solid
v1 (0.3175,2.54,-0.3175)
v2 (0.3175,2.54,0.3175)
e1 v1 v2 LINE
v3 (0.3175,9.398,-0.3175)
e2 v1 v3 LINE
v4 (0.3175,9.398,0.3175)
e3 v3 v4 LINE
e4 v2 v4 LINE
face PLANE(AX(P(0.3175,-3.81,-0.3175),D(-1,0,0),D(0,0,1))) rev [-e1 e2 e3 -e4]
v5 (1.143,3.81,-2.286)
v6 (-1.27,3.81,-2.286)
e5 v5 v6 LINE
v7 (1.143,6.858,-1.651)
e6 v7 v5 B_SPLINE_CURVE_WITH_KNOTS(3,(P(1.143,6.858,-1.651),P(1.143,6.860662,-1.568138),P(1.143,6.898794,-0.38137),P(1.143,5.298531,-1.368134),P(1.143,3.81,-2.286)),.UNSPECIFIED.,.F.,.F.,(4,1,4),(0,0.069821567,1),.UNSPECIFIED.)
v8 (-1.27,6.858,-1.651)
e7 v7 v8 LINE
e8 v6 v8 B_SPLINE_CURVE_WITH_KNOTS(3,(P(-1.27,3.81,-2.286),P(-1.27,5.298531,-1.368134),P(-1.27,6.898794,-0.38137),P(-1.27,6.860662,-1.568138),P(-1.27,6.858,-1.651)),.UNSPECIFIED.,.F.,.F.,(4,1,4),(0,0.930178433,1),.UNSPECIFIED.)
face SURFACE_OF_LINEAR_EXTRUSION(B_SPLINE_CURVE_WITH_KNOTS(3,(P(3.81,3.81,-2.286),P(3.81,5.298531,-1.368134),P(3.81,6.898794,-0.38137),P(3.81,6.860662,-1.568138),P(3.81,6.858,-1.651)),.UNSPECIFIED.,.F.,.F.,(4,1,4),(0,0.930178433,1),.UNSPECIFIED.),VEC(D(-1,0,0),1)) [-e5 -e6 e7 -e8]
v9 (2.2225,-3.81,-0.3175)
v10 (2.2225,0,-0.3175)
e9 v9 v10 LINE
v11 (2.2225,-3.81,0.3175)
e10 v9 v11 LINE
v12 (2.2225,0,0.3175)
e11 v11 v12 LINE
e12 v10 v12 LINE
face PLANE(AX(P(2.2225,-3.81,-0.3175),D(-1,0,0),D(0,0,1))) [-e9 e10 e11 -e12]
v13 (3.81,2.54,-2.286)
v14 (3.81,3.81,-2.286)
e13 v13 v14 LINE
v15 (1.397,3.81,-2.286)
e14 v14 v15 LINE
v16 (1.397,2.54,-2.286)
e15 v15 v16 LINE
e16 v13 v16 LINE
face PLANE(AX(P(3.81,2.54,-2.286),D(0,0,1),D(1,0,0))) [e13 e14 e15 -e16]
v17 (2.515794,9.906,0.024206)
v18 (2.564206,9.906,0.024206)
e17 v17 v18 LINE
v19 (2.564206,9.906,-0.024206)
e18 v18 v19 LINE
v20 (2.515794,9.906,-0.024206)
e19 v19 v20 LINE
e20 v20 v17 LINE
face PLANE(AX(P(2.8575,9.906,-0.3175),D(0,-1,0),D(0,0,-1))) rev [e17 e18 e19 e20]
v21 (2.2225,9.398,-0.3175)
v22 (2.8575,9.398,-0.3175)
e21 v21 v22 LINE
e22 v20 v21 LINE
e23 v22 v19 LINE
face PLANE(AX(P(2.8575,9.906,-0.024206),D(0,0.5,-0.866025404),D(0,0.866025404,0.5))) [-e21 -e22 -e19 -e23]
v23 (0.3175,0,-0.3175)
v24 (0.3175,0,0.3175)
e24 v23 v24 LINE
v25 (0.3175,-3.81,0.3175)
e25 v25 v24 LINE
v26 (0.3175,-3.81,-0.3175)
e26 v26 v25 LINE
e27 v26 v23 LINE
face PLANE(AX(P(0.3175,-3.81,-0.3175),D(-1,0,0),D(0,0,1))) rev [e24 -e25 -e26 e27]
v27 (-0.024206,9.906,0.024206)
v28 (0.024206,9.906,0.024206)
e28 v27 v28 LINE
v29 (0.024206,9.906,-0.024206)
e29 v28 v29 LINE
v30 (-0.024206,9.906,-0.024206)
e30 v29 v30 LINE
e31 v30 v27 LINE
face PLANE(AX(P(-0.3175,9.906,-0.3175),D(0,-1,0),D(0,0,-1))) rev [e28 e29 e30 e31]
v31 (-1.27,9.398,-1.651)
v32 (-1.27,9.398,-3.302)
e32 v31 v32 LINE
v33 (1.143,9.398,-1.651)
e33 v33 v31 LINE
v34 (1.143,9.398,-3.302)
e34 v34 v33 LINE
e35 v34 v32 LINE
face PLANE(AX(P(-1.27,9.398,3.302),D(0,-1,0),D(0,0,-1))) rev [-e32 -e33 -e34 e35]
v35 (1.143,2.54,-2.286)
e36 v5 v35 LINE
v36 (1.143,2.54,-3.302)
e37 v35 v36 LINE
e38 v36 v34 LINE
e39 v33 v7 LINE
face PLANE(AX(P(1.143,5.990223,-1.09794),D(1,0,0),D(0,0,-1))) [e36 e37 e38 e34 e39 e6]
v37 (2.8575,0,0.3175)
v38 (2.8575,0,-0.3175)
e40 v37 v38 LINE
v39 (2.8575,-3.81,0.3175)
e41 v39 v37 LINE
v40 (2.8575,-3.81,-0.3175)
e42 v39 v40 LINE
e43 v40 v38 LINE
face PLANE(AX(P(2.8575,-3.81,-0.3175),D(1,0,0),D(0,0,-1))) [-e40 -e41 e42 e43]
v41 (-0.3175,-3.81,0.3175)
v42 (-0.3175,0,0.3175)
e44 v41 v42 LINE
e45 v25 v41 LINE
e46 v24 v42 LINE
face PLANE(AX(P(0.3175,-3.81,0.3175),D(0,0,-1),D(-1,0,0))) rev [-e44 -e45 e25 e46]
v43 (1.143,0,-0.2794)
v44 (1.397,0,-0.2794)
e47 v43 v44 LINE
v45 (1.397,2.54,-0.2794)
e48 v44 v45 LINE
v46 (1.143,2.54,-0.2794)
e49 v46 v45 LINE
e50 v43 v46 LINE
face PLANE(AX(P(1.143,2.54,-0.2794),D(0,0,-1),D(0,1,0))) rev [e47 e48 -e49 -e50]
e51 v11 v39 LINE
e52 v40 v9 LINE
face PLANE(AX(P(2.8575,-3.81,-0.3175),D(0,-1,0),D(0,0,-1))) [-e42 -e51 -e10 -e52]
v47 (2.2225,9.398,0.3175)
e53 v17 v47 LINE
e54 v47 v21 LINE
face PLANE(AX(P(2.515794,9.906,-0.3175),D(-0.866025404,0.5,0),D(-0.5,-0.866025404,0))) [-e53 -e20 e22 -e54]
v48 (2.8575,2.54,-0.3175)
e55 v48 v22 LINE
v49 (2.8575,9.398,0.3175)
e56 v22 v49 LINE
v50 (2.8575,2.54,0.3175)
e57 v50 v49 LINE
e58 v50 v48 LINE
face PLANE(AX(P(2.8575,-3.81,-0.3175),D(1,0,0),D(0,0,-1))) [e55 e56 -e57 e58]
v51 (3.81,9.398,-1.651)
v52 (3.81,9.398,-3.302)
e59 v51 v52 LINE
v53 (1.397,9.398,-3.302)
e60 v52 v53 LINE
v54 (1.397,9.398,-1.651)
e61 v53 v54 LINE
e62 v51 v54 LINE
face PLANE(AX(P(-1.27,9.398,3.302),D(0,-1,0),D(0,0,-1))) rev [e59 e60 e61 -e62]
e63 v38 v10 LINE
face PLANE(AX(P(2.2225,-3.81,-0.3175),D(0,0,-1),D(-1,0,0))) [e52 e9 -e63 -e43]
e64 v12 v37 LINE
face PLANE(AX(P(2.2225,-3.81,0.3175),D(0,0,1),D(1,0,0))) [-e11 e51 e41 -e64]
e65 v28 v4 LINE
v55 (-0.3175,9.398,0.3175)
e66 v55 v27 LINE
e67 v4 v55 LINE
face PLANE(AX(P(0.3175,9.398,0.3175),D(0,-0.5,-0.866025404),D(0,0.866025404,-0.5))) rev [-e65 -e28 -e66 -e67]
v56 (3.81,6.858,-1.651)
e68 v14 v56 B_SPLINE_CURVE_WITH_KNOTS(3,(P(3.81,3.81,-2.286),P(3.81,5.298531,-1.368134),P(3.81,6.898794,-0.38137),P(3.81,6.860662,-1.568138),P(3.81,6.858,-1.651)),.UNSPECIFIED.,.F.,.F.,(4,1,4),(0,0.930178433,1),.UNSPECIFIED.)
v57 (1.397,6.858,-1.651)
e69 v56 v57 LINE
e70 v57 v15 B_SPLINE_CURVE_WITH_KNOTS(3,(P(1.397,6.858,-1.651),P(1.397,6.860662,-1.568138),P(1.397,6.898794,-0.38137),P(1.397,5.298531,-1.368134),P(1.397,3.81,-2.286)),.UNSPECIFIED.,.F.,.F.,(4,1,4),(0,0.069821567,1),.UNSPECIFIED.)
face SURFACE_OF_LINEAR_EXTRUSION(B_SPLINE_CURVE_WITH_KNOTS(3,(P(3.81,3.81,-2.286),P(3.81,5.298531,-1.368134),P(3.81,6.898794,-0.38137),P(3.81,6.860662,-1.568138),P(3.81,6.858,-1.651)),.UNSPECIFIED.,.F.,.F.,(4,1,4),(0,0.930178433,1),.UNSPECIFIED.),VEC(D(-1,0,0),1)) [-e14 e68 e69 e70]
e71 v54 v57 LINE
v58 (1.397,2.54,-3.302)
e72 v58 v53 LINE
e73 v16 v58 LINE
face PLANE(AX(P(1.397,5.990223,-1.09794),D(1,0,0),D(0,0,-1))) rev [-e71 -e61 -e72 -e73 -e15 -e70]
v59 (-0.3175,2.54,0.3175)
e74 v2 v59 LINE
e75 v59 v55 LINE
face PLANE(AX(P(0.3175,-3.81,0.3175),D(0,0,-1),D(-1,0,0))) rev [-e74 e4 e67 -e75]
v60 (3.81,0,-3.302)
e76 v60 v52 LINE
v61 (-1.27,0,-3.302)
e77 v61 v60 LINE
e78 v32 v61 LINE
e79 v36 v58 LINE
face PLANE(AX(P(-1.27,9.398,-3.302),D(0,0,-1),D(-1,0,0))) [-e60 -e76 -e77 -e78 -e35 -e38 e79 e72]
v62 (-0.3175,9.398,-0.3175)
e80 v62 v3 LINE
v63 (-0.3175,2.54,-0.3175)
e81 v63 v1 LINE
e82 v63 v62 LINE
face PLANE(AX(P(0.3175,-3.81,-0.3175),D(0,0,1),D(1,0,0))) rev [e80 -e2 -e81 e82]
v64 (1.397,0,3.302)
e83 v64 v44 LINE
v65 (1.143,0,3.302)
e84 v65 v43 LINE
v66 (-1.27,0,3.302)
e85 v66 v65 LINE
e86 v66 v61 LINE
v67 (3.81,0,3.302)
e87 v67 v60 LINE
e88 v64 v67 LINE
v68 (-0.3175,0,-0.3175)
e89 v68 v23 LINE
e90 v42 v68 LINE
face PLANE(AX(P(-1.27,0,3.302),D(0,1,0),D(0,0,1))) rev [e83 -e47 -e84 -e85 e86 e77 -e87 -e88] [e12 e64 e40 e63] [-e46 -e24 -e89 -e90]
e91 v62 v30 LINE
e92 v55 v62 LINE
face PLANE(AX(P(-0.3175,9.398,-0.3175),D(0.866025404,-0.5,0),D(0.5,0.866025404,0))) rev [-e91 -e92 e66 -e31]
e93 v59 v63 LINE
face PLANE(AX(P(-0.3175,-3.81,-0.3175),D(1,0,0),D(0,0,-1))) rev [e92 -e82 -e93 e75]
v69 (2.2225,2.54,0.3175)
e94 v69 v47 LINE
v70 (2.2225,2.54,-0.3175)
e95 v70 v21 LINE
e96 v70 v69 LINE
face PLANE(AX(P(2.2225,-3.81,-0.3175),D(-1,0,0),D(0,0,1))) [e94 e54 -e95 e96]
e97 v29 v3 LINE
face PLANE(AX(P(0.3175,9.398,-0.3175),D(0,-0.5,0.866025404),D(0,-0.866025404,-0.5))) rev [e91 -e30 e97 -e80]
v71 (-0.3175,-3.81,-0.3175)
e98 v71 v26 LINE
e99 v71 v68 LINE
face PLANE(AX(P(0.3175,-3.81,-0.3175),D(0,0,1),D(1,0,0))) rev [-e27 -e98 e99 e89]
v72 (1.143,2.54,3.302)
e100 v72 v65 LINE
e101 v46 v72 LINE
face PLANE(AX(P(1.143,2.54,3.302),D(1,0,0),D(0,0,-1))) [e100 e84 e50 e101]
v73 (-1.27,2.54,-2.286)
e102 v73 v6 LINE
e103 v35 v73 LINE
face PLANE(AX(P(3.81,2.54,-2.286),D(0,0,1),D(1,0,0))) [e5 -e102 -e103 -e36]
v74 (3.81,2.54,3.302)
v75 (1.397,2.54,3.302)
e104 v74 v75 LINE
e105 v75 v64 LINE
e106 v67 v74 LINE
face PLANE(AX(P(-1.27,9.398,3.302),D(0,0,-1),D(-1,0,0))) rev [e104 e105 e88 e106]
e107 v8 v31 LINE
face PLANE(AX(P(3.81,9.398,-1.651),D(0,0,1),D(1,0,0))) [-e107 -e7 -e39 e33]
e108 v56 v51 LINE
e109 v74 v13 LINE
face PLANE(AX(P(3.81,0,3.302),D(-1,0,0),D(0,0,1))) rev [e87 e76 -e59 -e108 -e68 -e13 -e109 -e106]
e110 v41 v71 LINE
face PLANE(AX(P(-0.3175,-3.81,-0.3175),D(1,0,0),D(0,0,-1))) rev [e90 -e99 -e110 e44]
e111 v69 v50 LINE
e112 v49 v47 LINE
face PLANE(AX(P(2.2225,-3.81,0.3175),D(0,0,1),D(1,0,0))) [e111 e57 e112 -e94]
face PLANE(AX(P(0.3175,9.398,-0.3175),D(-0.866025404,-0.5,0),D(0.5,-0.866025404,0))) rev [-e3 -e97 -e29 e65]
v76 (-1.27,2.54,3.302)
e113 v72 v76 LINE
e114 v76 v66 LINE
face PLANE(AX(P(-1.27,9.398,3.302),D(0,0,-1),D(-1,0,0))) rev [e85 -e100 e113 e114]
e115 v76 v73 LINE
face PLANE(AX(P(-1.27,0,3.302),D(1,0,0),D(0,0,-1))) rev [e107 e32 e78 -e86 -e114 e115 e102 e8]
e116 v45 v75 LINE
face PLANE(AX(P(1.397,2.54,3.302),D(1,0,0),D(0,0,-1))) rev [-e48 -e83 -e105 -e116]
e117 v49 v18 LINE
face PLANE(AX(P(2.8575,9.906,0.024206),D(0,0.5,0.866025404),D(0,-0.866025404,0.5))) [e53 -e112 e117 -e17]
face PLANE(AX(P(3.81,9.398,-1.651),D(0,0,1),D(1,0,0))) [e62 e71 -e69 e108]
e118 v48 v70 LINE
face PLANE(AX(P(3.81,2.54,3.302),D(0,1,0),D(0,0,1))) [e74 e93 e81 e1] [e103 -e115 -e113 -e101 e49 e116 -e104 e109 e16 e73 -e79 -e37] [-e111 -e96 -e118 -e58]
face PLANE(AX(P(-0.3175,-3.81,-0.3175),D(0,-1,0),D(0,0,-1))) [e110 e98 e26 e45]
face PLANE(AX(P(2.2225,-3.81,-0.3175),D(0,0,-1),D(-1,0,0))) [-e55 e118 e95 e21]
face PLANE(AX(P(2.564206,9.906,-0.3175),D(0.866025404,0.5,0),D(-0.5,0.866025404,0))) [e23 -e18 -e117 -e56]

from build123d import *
from OCP.BRepFilletAPI import BRepFilletAPI_MakeChamfer

# Parameters (mm, degrees)
BASE_EXTRUDE_DEPTH        = 3.302
BASE_EXTRUDE_DEPTH_BACK   = 3.302
SKETCH3_W                 = 5.08
SKETCH3_H                 = 9.398
CUT_EXTRUDE1_START        = -5.08
CUT_EXTRUDE1_DEPTH        = 5.08
SKETCH5_W                 = 3.5814
SKETCH5_H                 = 2.54
CUT_EXTRUDE2_DEPTH        = 0.127
BOSS_EXTRUDE1_START       = -9.906
SKETCH6_W                 = 0.635
SKETCH6_H                 = 0.635
BOSS_EXTRUDE1_DEPTH       = 13.716
CHAMFER1_SIZE             = 0.508
CHAMFER1_SIZE2            = 0.293293937
CHAMFER1_OF_MIRROR1_SIZE  = 0.508
CHAMFER1_OF_MIRROR1_SIZE2 = 0.293293937


# Read off the part's stored shape, not the designer's step: Cut-Extrude1
with BuildPart() as part:
    # Sketch3 → Base-Extrude (new, two sides: drawn at the far end of the back side and taken through both)
    with BuildSketch(Plane.XY.offset(-BASE_EXTRUDE_DEPTH_BACK)):
        with Locations((1.27, 4.699)):
            Rectangle(SKETCH3_W, SKETCH3_H)
    extrude(amount=BASE_EXTRUDE_DEPTH + BASE_EXTRUDE_DEPTH_BACK)

    # Cut-Extrude1 outline → Cut-Extrude1 (cut)
    with BuildSketch(Plane.ZY.offset(1.27).offset(CUT_EXTRUDE1_START)):
        with BuildLine():
            add(Edge.make_bspline(
                [(-2.286, 3.81), (-1.368133743, 5.298530644), (-0.381370103, 6.898794196), (-1.568138006, 6.86066242), (-1.651, 6.858)],
                knots=[0, 0, 0, 0, 0.930178433, 1, 1, 1, 1], degree=3))
            Line((-2.286, 3.81), (-2.286, 2.54))
            Line((-2.286, 2.54), (3.302, 2.54))
            Line((3.302, 2.54), (3.302, 9.398))
            Line((3.302, 9.398), (-1.651, 9.398))
            Line((-1.651, 9.398), (-1.651, 6.858))
        make_face()
    extrude(amount=CUT_EXTRUDE1_DEPTH, mode=Mode.SUBTRACT)

    # Sketch5 → Cut-Extrude2 (cut, symmetric)
    with BuildSketch(Plane(origin=(1.27, 0, 0), x_dir=(0, 0, -1), z_dir=(1, 0, 0))):
        with Locations((-1.5113, 1.27)):
            Rectangle(SKETCH5_W, SKETCH5_H)
        with BuildLine():
            Line((3.302, 2.54), (3.302, 9.398))
            Line((3.302, 9.398), (1.651, 9.398))
            Line((1.651, 9.398), (1.651, 6.858))
            add(Edge.make_bspline(
                [(2.286, 3.81), (1.368133743, 5.298530644), (0.381370103, 6.898794196), (1.568138006, 6.86066242), (1.651, 6.858)],
                knots=[0, 0, 0, 0, 0.930178433, 1, 1, 1, 1], degree=3))
            Line((2.286, 3.81), (2.286, 2.54))
            Line((2.286, 2.54), (3.302, 2.54))
        make_face()
    extrude(amount=CUT_EXTRUDE2_DEPTH, both=True, mode=Mode.SUBTRACT)

    # Sketch6 → Boss-Extrude1 (add)
    with BuildSketch(Plane.XZ.offset(BOSS_EXTRUDE1_START)):
        Rectangle(SKETCH6_W, SKETCH6_H)
    boss_extrude1 = extrude(amount=BOSS_EXTRUDE1_DEPTH)

    # Chamfer1: one chamfer whose edges measure the first distance from different faces: ONE call of the kernel's chamfer builder (chamfer() names one face for all edges)
    chamfer1_edges_1 = [part.edges().sort_by_distance(p)[0] for p in [
        (-0.3175, 9.906, 0),
    ]]
    chamfer1_side_1 = [part.faces().sort_by_distance(p)[0] for p in [
        (-0.3175, 6.223, 0),
    ]]
    chamfer1_edges_2 = [part.edges().sort_by_distance(p)[0] for p in [
        (0, 9.906, -0.3175),
    ]]
    chamfer1_side_2 = [part.faces().sort_by_distance(p)[0] for p in [
        (0, 6.223, -0.3175),
    ]]
    chamfer1_edges_3 = [part.edges().sort_by_distance(p)[0] for p in [
        (0.3175, 9.906, 0),
    ]]
    chamfer1_side_3 = [part.faces().sort_by_distance(p)[0] for p in [
        (0.3175, 6.223, 0),
    ]]
    chamfer1_edges_4 = [part.edges().sort_by_distance(p)[0] for p in [
        (0, 9.906, 0.3175),
    ]]
    chamfer1_side_4 = [part.faces().sort_by_distance(p)[0] for p in [
        (0, 6.223, 0.3175),
    ]]
    chamfer1 = BRepFilletAPI_MakeChamfer(part.part.solid().wrapped)
    for e in chamfer1_edges_1:
        chamfer1.Add(CHAMFER1_SIZE, CHAMFER1_SIZE2, e.wrapped, chamfer1_side_1[0].wrapped)  # the first distance lies on this face
    for e in chamfer1_edges_2:
        chamfer1.Add(CHAMFER1_SIZE, CHAMFER1_SIZE2, e.wrapped, chamfer1_side_2[0].wrapped)  # the first distance lies on this face
    for e in chamfer1_edges_3:
        chamfer1.Add(CHAMFER1_SIZE, CHAMFER1_SIZE2, e.wrapped, chamfer1_side_3[0].wrapped)  # the first distance lies on this face
    for e in chamfer1_edges_4:
        chamfer1.Add(CHAMFER1_SIZE, CHAMFER1_SIZE2, e.wrapped, chamfer1_side_4[0].wrapped)  # the first distance lies on this face
    add(Compound.cast(chamfer1.Shape()), mode=Mode.REPLACE)

    # Mirror1: Boss-Extrude1 across plane
    add(boss_extrude1.mirror(Plane(origin=(1.27, 0, 0), x_dir=(0, 0, 1), z_dir=(1, 0, 0))))

    # Chamfer1 of Mirror1: one chamfer whose edges measure the first distance from different faces: ONE call of the kernel's chamfer builder (chamfer() names one face for all edges)
    chamfer1_of_mirror1_edges_1 = [part.edges().sort_by_distance(p)[0] for p in [
        (2.8575, 9.906, 0),
    ]]
    chamfer1_of_mirror1_side_1 = [part.faces().sort_by_distance(p)[0] for p in [
        (2.8575, 6.223, 0),
    ]]
    chamfer1_of_mirror1_edges_2 = [part.edges().sort_by_distance(p)[0] for p in [
        (2.54, 9.906, -0.3175),
    ]]
    chamfer1_of_mirror1_side_2 = [part.faces().sort_by_distance(p)[0] for p in [
        (2.54, 6.223, -0.3175),
    ]]
    chamfer1_of_mirror1_edges_3 = [part.edges().sort_by_distance(p)[0] for p in [
        (2.2225, 9.906, 0),
    ]]
    chamfer1_of_mirror1_side_3 = [part.faces().sort_by_distance(p)[0] for p in [
        (2.2225, 6.223, 0),
    ]]
    chamfer1_of_mirror1_edges_4 = [part.edges().sort_by_distance(p)[0] for p in [
        (2.54, 9.906, 0.3175),
    ]]
    chamfer1_of_mirror1_side_4 = [part.faces().sort_by_distance(p)[0] for p in [
        (2.54, 6.223, 0.3175),
    ]]
    chamfer1_of_mirror1 = BRepFilletAPI_MakeChamfer(part.part.solid().wrapped)
    for e in chamfer1_of_mirror1_edges_1:
        chamfer1_of_mirror1.Add(CHAMFER1_OF_MIRROR1_SIZE, CHAMFER1_OF_MIRROR1_SIZE2, e.wrapped, chamfer1_of_mirror1_side_1[0].wrapped)  # the first distance lies on this face
    for e in chamfer1_of_mirror1_edges_2:
        chamfer1_of_mirror1.Add(CHAMFER1_OF_MIRROR1_SIZE, CHAMFER1_OF_MIRROR1_SIZE2, e.wrapped, chamfer1_of_mirror1_side_2[0].wrapped)  # the first distance lies on this face
    for e in chamfer1_of_mirror1_edges_3:
        chamfer1_of_mirror1.Add(CHAMFER1_OF_MIRROR1_SIZE, CHAMFER1_OF_MIRROR1_SIZE2, e.wrapped, chamfer1_of_mirror1_side_3[0].wrapped)  # the first distance lies on this face
    for e in chamfer1_of_mirror1_edges_4:
        chamfer1_of_mirror1.Add(CHAMFER1_OF_MIRROR1_SIZE, CHAMFER1_OF_MIRROR1_SIZE2, e.wrapped, chamfer1_of_mirror1_side_4[0].wrapped)  # the first distance lies on this face
    add(Compound.cast(chamfer1_of_mirror1.Shape()), mode=Mode.REPLACE)


solid = part.part
